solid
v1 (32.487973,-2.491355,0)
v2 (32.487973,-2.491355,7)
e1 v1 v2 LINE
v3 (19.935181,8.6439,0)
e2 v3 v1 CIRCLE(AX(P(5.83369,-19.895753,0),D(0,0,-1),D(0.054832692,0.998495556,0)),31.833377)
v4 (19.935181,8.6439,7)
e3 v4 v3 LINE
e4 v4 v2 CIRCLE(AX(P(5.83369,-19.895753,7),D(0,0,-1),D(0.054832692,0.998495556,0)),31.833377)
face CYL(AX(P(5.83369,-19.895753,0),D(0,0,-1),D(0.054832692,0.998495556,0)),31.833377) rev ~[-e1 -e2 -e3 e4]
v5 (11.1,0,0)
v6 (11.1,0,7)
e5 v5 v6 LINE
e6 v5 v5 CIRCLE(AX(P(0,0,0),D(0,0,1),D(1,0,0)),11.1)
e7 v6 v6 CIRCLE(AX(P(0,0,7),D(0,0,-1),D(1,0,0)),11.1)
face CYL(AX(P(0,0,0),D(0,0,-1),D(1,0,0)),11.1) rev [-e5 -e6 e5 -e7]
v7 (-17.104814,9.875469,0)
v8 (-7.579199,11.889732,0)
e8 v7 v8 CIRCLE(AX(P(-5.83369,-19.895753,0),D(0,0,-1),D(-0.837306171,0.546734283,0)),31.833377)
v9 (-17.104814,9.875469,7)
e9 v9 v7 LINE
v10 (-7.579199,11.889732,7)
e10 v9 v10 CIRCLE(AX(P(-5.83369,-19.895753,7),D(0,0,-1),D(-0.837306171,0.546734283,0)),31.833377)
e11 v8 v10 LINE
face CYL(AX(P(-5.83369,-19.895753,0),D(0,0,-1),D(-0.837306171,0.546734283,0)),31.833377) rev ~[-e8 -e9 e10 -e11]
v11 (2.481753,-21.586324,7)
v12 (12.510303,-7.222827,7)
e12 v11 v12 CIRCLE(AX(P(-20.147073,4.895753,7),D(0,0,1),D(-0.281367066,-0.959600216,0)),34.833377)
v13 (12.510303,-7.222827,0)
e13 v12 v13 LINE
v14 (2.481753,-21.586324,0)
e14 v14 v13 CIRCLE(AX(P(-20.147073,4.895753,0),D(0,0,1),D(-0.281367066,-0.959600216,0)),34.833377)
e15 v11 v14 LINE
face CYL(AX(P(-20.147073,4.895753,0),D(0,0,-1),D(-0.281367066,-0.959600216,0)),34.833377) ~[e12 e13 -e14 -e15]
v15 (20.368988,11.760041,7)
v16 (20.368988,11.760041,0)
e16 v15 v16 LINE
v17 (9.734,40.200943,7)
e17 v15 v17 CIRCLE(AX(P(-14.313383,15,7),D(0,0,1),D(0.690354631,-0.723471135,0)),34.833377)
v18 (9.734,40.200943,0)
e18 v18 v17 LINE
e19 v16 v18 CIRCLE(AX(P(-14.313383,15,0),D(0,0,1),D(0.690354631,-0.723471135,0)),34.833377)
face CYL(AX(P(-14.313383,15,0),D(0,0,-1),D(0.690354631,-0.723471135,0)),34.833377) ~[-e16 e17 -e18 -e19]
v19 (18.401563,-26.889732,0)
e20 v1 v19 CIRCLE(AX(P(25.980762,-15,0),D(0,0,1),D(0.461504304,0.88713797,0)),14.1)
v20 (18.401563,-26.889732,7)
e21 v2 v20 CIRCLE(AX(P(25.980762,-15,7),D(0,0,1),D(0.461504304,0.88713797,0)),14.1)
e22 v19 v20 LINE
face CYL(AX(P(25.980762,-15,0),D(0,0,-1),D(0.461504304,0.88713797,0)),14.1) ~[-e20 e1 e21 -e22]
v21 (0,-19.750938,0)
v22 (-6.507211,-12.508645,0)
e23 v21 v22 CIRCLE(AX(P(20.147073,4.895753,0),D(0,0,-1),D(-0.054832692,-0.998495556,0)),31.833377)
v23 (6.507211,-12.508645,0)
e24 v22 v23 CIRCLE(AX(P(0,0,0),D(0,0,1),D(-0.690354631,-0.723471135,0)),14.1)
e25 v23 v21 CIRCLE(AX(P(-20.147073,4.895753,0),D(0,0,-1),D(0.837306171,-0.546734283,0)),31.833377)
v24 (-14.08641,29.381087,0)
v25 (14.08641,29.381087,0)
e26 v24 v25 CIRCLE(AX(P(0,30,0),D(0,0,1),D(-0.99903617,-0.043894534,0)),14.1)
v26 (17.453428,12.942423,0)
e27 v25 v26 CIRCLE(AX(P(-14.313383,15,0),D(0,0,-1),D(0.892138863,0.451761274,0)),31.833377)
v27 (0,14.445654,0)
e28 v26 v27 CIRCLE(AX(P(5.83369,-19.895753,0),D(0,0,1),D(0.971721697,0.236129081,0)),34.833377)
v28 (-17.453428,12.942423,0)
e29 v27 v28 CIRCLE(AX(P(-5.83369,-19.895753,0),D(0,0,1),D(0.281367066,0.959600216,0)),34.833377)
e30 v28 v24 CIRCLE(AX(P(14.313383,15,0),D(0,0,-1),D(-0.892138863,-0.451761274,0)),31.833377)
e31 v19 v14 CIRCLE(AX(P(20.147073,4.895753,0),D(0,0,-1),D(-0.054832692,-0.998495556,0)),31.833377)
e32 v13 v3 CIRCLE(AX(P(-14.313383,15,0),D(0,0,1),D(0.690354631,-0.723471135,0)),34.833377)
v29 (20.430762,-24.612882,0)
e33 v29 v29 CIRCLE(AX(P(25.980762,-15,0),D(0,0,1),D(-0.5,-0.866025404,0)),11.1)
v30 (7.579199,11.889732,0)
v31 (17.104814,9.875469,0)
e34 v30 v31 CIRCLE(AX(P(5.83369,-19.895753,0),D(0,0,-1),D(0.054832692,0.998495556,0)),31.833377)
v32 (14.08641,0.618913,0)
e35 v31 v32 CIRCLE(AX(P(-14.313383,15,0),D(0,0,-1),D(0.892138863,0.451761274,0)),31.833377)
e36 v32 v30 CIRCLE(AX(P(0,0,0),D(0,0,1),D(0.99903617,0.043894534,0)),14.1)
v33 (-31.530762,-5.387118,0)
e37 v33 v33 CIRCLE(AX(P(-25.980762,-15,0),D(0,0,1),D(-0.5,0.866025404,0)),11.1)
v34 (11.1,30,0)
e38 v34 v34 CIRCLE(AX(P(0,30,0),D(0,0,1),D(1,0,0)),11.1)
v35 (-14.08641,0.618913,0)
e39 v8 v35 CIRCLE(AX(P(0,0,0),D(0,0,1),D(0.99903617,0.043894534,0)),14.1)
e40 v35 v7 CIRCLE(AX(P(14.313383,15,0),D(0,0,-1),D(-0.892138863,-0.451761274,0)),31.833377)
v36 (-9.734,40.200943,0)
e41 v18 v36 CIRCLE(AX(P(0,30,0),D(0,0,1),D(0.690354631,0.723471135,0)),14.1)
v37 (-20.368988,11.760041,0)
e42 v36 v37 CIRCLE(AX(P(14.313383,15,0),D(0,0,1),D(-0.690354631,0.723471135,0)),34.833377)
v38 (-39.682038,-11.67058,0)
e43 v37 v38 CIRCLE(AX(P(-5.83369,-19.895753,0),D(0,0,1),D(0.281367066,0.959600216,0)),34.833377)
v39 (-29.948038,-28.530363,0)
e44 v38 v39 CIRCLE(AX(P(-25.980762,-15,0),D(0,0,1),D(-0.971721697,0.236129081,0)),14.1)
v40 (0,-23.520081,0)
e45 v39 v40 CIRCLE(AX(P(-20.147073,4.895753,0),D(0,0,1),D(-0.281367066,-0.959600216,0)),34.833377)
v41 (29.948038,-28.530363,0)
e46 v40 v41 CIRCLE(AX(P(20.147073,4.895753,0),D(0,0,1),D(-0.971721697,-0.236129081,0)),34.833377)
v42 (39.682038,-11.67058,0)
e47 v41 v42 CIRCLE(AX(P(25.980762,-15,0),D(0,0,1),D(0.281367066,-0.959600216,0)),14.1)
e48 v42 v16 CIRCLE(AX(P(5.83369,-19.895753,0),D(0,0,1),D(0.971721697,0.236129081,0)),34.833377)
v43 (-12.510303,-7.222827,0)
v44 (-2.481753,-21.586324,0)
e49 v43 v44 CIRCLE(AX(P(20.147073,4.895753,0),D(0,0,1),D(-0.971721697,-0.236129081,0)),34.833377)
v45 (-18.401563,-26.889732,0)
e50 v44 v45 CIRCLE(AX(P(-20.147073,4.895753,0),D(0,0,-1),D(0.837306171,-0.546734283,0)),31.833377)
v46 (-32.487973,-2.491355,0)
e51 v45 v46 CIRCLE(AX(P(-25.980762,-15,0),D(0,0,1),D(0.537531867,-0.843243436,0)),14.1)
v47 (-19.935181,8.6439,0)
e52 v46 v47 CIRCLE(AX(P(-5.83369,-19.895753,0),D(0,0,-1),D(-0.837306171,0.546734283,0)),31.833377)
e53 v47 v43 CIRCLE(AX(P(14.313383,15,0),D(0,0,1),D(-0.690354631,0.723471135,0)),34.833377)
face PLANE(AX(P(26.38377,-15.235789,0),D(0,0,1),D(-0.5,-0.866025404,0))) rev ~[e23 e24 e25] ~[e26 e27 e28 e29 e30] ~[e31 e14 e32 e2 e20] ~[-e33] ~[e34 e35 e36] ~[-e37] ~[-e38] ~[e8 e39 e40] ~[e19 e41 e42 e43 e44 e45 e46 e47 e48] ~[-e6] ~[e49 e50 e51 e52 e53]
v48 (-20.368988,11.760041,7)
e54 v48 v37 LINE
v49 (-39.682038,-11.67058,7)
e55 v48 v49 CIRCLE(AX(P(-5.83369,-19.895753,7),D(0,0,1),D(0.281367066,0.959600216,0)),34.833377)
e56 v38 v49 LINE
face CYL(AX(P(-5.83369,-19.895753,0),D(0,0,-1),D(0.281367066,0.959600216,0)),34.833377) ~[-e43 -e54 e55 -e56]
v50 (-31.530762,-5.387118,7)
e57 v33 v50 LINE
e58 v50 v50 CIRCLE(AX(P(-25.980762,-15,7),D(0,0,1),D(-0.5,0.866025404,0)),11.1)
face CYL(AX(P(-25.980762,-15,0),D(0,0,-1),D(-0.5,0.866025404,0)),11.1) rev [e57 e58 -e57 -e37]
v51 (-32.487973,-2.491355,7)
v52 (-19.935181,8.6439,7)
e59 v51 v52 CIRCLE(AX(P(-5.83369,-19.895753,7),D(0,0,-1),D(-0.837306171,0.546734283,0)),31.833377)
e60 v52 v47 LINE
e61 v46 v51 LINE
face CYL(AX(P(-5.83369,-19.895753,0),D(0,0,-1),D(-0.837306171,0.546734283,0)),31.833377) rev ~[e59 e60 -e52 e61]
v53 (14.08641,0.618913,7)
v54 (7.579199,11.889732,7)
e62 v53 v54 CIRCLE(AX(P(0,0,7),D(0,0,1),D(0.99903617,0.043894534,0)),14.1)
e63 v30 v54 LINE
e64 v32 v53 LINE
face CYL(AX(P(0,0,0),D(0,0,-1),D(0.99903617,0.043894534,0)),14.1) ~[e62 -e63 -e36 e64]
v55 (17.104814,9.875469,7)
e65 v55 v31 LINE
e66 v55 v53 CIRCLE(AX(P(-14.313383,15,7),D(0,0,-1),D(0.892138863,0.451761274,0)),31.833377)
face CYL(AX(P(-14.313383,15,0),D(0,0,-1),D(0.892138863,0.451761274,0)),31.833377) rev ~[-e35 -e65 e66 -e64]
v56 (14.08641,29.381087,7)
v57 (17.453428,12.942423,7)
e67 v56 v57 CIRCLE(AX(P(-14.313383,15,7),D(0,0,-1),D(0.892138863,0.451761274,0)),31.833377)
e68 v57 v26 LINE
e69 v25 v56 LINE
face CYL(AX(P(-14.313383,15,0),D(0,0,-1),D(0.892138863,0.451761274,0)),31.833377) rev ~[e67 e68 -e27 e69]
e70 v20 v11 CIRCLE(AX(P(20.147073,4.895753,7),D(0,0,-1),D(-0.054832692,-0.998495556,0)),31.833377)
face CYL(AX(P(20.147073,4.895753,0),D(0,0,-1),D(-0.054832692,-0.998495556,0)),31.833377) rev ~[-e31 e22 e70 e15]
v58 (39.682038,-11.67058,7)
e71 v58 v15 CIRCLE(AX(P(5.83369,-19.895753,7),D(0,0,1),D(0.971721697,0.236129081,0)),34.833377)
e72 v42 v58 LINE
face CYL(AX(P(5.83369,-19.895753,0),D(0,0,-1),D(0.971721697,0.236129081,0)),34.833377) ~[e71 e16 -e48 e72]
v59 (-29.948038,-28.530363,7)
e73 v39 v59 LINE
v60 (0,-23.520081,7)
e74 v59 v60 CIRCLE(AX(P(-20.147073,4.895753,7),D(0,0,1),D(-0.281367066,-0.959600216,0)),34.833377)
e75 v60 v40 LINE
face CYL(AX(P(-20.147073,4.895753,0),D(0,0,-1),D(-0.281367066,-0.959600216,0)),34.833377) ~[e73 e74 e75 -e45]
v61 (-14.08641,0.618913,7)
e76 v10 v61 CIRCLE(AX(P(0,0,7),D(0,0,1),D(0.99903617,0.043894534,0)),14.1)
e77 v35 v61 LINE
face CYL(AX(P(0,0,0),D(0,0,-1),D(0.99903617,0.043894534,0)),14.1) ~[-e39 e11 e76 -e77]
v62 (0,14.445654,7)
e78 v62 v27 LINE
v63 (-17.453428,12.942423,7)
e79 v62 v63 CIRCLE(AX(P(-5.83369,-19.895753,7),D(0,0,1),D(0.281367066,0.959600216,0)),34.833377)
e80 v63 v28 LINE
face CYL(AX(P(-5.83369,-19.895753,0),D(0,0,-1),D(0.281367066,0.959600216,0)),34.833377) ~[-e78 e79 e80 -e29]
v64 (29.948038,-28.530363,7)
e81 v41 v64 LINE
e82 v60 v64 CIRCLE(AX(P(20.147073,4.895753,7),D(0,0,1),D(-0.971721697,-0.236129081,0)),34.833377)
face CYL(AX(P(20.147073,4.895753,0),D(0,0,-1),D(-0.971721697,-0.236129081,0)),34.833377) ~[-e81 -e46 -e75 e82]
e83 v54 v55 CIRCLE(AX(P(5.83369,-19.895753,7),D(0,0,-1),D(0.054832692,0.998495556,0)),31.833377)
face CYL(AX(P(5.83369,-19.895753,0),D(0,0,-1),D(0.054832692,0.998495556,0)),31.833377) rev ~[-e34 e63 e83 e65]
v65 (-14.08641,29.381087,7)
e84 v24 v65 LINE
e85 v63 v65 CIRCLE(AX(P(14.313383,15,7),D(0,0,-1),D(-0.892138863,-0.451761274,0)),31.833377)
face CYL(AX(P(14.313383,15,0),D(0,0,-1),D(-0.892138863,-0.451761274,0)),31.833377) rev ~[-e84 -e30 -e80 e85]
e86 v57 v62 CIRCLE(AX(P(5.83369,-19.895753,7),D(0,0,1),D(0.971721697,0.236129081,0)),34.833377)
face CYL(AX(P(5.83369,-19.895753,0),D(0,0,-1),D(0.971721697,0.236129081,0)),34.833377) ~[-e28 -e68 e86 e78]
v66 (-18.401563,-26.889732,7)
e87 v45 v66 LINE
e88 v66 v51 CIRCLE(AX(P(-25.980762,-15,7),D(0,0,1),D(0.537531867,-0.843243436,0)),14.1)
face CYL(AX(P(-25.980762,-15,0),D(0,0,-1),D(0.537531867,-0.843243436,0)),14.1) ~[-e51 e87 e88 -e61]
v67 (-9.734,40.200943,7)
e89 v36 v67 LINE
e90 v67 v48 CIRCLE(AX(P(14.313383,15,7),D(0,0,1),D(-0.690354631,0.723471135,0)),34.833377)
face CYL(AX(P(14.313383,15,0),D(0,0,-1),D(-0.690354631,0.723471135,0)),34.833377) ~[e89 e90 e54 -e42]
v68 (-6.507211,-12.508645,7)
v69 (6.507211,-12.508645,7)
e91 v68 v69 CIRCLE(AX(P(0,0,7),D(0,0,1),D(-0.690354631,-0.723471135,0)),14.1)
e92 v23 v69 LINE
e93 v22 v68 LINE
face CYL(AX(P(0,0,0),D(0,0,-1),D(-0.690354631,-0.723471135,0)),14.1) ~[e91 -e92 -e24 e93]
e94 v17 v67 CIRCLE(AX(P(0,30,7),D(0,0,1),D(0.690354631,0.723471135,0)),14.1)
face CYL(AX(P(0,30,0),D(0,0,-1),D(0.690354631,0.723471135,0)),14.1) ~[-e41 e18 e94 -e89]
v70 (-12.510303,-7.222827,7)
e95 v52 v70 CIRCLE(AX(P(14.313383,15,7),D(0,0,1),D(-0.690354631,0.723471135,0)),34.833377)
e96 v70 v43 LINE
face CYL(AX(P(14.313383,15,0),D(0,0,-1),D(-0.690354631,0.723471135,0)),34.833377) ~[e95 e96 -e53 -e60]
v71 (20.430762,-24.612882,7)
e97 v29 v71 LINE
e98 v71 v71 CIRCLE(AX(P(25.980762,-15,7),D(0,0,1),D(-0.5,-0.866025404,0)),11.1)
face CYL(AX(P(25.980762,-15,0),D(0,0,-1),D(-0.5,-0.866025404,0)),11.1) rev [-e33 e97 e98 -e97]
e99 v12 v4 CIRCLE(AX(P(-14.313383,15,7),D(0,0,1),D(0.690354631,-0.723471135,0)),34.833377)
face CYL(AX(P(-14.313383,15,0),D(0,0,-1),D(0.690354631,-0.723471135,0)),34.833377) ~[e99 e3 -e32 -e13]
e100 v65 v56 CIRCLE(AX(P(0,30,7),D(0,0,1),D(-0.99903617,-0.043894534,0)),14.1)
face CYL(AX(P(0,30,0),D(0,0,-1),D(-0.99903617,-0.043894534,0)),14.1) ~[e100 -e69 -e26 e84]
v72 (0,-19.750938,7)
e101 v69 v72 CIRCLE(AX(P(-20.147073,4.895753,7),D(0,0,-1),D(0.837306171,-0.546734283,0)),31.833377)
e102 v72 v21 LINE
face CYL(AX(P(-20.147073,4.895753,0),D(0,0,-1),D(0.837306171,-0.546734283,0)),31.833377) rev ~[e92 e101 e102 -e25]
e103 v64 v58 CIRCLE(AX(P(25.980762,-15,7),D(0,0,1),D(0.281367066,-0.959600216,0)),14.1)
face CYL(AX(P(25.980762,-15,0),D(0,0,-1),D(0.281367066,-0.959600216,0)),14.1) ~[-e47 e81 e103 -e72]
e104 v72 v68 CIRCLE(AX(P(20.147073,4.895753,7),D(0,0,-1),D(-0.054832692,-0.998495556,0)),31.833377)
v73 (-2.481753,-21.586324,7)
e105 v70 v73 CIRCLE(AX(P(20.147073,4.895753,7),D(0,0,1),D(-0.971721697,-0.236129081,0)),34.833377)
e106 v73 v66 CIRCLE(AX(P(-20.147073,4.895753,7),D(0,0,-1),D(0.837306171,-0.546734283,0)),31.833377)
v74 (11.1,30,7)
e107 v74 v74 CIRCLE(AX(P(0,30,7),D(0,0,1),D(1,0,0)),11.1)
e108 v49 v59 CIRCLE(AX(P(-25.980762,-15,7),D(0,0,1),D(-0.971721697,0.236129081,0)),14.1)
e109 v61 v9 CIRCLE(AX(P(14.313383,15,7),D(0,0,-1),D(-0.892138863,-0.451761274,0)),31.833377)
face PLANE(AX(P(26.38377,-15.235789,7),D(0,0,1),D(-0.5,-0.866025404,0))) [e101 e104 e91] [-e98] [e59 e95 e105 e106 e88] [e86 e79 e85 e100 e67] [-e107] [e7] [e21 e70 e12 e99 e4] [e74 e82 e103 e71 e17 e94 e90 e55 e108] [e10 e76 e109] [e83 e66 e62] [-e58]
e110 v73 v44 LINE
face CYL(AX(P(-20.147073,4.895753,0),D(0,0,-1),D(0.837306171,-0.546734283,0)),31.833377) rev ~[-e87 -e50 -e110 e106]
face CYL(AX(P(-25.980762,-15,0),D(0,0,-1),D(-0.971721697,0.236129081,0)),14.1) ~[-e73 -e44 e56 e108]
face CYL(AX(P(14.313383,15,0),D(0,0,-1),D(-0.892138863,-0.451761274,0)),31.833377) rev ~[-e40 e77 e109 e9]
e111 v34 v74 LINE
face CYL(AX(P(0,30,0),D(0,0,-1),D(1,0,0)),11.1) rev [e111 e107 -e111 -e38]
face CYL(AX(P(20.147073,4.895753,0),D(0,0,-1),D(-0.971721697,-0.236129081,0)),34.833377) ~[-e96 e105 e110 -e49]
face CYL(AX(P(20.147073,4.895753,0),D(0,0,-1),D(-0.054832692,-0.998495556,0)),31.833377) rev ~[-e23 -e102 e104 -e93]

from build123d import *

# Parameters (mm, degrees)
F0_R            = 11.1
F1_DEPTH        = 7
F1_COPIES_COUNT = 3


# Not quite as in the source:
# - a pattern or mirror of a feature is missing from the dataset's text; its kind, count and spacing are read off the source's solid


with BuildPart() as f1:
    # F0 (on Top) → F1 (new body)
    with BuildSketch(Plane.XY):
        with BuildLine():
            ThreePointArc((14.0864100033, 29.3810870676), (14.0966020914, 29.690468941), (14.1, 30))
            ThreePointArc((14.1, 30), (12.9626271297, 35.5479994499), (9.7340002984, 40.200943005))
            ThreePointArc((9.7340002984, 40.200943005), (0, 44.1), (-9.7340002984, 40.200943005))
            ThreePointArc((-9.7340002984, 40.200943005), (-13.0812960888, 35.2620996416), (-14.0864100033, 29.3810870676))
            ThreePointArc((-14.0864100033, 29.3810870676), (0, 15.9), (14.0864100033, 29.3810870676))
        make_face()
        with Locations((0, 30)):
            Circle(F0_R, mode=Mode.SUBTRACT)
        with BuildLine():
            ThreePointArc((9.7340002984, 40.200943005), (12.9626271297, 35.5479994499), (14.1, 30))
            ThreePointArc((14.1, 30), (14.0966020914, 29.690468941), (14.0864100033, 29.3810870676))
            ThreePointArc((14.0864100033, 29.3810870676), (17.5199942586, 15), (14.0864100033, 0.6189129324))
            ThreePointArc((14.0864100033, 0.6189129324), (14.0966020914, 0.309531059), (14.1, 0))
            ThreePointArc((14.1, 0), (12.9626271297, -5.5479994499), (9.7340002984, -10.200943005))
            ThreePointArc((9.7340002984, -10.200943005), (20.5199942586, 15), (9.7340002984, 40.200943005))
        make_face()
        with BuildLine():
            ThreePointArc((-9.7340002984, -10.200943005), (0, -14.1), (9.7340002984, -10.200943005))
            ThreePointArc((9.7340002984, -10.200943005), (12.9626271297, -5.5479994499), (14.1, 0))
            ThreePointArc((14.1, 0), (14.0966020914, 0.309531059), (14.0864100033, 0.6189129324))
            ThreePointArc((14.0864100033, 0.6189129324), (0, 14.1), (-14.0864100033, 0.6189129324))
            ThreePointArc((-14.0864100033, 0.6189129324), (-13.0812960888, -5.2620996416), (-9.7340002984, -10.200943005))
        make_face()
        Circle(F0_R, mode=Mode.SUBTRACT)
        with BuildLine():
            ThreePointArc((-14.0864100033, 29.3810870676), (-13.0812960888, 35.2620996416), (-9.7340002984, 40.200943005))
            ThreePointArc((-9.7340002984, 40.200943005), (-20.5199942586, 15), (-9.7340002984, -10.200943005))
            ThreePointArc((-9.7340002984, -10.200943005), (-13.0812960888, -5.2620996416), (-14.0864100033, 0.6189129324))
            ThreePointArc((-14.0864100033, 0.6189129324), (-17.5199942586, 15), (-14.0864100033, 29.3810870676))
        make_face()
    extrude(amount=F1_DEPTH)

    # F1_copies: F1 ×3 about axis
    f1_copies_axis = Axis((0, 0, 0), (0, 0, 1))


with BuildPart() as f1_1:
    add(f1.part)
    for i in range(1, F1_COPIES_COUNT):
        add(f1.part.rotate(f1_copies_axis, i * 360 / F1_COPIES_COUNT))


solid = f1_1.part
